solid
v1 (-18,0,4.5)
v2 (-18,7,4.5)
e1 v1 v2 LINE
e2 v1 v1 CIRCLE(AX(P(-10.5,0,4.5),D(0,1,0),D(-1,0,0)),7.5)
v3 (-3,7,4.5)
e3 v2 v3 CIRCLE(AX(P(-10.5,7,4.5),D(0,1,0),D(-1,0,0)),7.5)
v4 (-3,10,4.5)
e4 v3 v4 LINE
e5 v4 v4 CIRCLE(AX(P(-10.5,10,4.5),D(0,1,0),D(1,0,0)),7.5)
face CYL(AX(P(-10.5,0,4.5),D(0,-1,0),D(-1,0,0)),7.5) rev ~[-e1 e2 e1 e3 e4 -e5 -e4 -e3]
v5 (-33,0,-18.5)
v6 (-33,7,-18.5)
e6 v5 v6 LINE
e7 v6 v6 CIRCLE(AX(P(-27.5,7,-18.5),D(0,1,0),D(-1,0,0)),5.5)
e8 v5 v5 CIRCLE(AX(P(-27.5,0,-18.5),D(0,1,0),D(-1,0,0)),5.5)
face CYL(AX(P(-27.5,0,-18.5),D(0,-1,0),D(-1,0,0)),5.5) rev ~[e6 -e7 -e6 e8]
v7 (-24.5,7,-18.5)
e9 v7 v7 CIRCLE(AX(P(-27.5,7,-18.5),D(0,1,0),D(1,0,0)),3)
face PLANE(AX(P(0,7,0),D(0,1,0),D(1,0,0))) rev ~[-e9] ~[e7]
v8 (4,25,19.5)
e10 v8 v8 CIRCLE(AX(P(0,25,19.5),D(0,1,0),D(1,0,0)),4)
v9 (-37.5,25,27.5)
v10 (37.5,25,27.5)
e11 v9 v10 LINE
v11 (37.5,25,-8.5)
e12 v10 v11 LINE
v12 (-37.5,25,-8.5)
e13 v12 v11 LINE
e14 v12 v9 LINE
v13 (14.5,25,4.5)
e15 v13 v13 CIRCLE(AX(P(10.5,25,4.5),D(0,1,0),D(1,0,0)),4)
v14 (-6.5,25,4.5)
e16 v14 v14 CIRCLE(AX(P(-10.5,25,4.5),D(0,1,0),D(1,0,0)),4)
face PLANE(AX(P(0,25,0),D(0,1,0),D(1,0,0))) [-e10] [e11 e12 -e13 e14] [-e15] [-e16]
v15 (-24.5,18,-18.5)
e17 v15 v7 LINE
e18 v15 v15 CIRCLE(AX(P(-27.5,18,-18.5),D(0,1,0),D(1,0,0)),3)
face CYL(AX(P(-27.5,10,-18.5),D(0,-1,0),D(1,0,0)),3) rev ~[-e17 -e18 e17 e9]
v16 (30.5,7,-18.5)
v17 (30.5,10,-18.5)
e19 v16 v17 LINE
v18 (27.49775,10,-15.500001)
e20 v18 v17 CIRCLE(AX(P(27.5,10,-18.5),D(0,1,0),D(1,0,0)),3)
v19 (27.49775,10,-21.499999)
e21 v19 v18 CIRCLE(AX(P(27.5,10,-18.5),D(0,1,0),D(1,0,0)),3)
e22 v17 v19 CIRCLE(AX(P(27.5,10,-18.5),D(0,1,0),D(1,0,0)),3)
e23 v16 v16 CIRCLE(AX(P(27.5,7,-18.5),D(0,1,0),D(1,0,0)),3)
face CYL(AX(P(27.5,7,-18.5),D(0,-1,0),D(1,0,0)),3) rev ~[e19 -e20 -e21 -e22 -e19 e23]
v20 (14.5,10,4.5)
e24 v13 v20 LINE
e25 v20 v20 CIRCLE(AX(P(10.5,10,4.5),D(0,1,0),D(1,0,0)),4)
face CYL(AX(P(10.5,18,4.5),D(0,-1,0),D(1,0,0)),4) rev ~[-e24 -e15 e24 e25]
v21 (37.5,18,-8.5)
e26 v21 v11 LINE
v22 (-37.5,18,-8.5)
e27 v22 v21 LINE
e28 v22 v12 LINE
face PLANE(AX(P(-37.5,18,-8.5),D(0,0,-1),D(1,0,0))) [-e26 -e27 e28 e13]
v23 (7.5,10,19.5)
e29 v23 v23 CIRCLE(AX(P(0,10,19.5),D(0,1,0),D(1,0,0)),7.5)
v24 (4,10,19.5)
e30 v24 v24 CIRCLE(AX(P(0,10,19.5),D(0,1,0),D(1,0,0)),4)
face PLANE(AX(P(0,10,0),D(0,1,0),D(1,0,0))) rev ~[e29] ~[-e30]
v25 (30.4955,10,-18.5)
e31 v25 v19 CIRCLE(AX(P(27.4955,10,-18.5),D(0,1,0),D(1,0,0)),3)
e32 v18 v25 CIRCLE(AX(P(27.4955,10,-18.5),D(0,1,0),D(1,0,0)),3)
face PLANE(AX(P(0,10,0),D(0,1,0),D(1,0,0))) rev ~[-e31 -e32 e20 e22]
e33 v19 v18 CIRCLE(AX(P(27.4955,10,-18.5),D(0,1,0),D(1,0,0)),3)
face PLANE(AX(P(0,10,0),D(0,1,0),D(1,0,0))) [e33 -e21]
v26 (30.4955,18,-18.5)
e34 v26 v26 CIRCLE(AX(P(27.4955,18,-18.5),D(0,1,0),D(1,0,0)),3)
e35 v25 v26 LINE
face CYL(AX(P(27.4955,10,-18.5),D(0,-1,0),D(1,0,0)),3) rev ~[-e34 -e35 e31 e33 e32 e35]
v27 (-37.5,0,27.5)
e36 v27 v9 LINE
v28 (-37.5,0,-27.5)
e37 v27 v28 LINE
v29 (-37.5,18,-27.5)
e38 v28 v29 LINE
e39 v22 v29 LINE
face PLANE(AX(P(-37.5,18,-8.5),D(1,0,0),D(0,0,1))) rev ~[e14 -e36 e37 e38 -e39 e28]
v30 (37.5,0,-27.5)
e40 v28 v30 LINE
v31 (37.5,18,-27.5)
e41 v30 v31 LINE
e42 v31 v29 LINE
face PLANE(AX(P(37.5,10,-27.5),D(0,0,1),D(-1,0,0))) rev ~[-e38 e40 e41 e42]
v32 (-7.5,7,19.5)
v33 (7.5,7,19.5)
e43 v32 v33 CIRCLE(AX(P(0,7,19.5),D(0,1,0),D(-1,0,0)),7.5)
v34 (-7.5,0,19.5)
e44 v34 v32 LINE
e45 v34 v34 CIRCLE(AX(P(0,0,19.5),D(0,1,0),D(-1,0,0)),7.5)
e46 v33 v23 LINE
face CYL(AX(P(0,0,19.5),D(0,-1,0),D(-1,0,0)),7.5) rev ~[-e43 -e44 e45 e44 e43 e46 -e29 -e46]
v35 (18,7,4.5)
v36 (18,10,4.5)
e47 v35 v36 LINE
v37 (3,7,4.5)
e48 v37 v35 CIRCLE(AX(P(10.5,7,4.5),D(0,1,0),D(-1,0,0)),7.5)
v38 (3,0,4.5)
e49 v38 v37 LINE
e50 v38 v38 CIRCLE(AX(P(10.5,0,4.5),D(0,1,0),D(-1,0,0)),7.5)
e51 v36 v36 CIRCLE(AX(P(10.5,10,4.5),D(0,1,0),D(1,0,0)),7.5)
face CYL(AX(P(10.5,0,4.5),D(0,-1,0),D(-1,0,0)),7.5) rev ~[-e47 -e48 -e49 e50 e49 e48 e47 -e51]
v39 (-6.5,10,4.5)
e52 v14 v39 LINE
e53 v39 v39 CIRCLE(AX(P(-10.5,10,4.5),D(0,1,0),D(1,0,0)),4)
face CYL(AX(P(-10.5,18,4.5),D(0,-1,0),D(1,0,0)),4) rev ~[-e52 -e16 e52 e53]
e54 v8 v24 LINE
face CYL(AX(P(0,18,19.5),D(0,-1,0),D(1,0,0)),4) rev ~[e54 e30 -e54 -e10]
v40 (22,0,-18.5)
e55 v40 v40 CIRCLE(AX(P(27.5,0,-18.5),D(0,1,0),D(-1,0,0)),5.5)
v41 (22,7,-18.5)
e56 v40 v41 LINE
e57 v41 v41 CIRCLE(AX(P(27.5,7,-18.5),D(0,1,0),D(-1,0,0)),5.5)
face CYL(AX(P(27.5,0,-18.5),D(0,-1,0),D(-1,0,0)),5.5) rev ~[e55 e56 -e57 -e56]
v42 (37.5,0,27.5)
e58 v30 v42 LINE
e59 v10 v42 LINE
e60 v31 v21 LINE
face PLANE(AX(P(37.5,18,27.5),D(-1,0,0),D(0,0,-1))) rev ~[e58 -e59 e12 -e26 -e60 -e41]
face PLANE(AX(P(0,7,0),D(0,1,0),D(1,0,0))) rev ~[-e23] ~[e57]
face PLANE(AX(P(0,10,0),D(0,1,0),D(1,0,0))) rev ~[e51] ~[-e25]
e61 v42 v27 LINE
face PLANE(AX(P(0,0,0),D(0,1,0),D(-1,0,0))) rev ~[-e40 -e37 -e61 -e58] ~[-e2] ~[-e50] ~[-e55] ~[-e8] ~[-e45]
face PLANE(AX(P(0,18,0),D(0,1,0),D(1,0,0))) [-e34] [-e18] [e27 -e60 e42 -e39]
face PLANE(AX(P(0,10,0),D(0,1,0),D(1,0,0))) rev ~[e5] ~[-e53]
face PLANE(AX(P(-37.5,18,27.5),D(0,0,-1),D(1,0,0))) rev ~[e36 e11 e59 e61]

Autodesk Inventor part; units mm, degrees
ref_plane "YZ Plane" through (0, 0, 0) normal (1, 0, 0) x (0, 1, 0)
ref_plane "XZ Plane" through (0, 0, 0) normal (0, 1, 0) x (-1, 0, 0)
ref_plane "XY Plane" through (0, 0, 0) normal (0, 0, 1) x (1, 0, 0)
sketch "Sketch1" plane through (0, 0, 0) normal (0, 1, 0) x (-1, 0, 0)
  line L0 (-37.5, 27.5) -> (37.5, 27.5)
  line L1 (37.5, 27.5) -> (37.5, -27.5)
  line L2 (37.5, -27.5) -> (-37.5, -27.5)
  line L3 (-37.5, -27.5) -> (-37.5, 27.5)
  line L4 (-37.5, 27.5) -> (37.5, -27.5) construction
  line L5 (37.5, 27.5) -> (-37.5, -27.5) construction
  circle A0 centre (27.5, -18.5) radius 5.5
  circle A1 centre (-27.5, -18.5) radius 5.5
  circle A2 centre (0, 19.5) radius 7.5
  circle A3 centre (10.5, 4.5) radius 7.5
  circle A4 centre (-10.5, 4.5) radius 7.5
  point P0 (0, 0)
  point P1 (0, 27.5)
  dimension "d0" = 75
  dimension "d1" = 55
  dimension "d2" = 11
  dimension "d4" = 11
  dimension "d6" = 55
  dimension "d7" = 10
  dimension "d8" = 10
  dimension "d9" = 15
  dimension "d11" = 15
  dimension "d13" = 15
  dimension "d15" = 23
  dimension "d16" = 8
  dimension "d17" = 21
  dimension "d18" = 10.5
  dimension "d19" = 46
extrude "Extrusion1" add sketch "Sketch1" along normal blind 7
sketch "Sketch2" plane through (0, 7, 0) normal (0, 1, 0) x (1, 0, 0)
  line L0 (37.5, 27.5) -> (-37.5, 27.5) projected
  line L1 (37.5, -27.5) -> (-37.5, -27.5)
  line L2 (-37.5, -27.5) -> (-37.5, 27.5)
  line L3 (-37.5, 27.5) -> (37.5, 27.5)
  line L4 (37.5, 27.5) -> (37.5, -27.5)
  line L5 (37.5, -27.5) -> (-37.5, 27.5) construction
  line L6 (-37.5, -27.5) -> (37.5, 27.5) construction
  circle A0 centre (-27.5, 18.5) radius 3
  circle A1 centre (27.5, 18.5) radius 3
  circle A2 centre (-10.5, -4.5) radius 7.5
  circle A3 centre (10.5, -4.5) radius 7.5
  circle A4 centre (0, -19.5) radius 7.5
  circle A5 centre (0, -19.5) radius 4
  circle A6 centre (-10.5, -4.5) radius 4
  circle A7 centre (10.5, -4.5) radius 4
  line L7 (-37.5, -27.5) -> (37.5, -27.5) projected
  point P0 (0, 0)
  point P1 (0, -27.5)
  point P2 (0, -27.5)
  dimension "d22" = 6
  dimension "d23" = 6
  dimension "d24" = 15
  dimension "d25" = 15
  dimension "d26" = 15
  dimension "d27" = 8
  dimension "d28" = 8
  dimension "d29" = 8
  dimension "d30" = 55
  dimension "d31" = 10
  dimension "d32" = 10
  dimension "d33" = 46
  dimension "d34" = 23
  dimension "d35" = 8
  dimension "d36" = 10.5
  dimension "d37" = 10.5
  dimension "d38" = 21
extrude "Extrusion2" add sketch "Sketch2" along normal blind 3 contours L4 L1 L2 L0
sketch "Sketch3" plane through (0, 10, 0) normal (0, 1, 0) x (1, 0, 0)
  line L0 (37.5, 27.5) -> (-37.5, 27.5) projected
  line L1 (37.5, -27.5) -> (-37.5, -27.5)
  line L2 (-37.5, -27.5) -> (-37.5, 27.5)
  line L3 (-37.5, 27.5) -> (37.5, 27.5)
  line L4 (37.5, 27.5) -> (37.5, -27.5)
  line L5 (37.5, -27.5) -> (-37.5, 27.5) construction
  line L6 (-37.5, -27.5) -> (37.5, 27.5) construction
  circle A0 centre (-27.5, 18.5) radius 3 projected
  circle A1 centre (-27.5, 18.5) radius 3
  circle A2 centre (27.4955, 18.5) radius 3
  circle A3 centre (-10.5, -4.5) radius 4
  circle A4 centre (10.5, -4.5) radius 4
  circle A5 centre (0, -19.5) radius 4
  line L7 (-37.5, -27.5) -> (37.5, -27.5) projected
  point P0 (0, 0)
  point P1 (0, -27.5)
  point P2 (0, -27.5)
  dimension "d41" = 6
  dimension "d42" = 8
  dimension "d43" = 8
  dimension "d44" = 8
  dimension "d45" = 8
  dimension "d46" = 23
  dimension "d47" = 10.5
  dimension "d48" = 10.5
extrude "Extrusion3" add sketch "Sketch3" along normal blind 8
sketch "Sketch4" plane through (0, 18, 0) normal (0, 1, 0) x (1, 0, 0)
  line L0 (-37.5, 8.5) -> (37.5, 8.5)
  line L1 (-37.5, -27.5) -> (37.5, -27.5) projected
  line L2 (-37.5, 27.5) -> (-37.5, -27.5) projected
  line L3 (-37.5, 8.5) -> (-37.5, -27.5)
  line L4 (-37.5, -27.5) -> (37.5, -27.5) projected
  line L5 (-37.5, -27.5) -> (37.5, -27.5)
  line L6 (37.5, -27.5) -> (37.5, 8.5)
  circle A0 centre (-10.5, -4.5) radius 4
  circle A1 centre (10.5, -4.5) radius 4
  circle A2 centre (0, -19.5) radius 4
  point P0 (0, 0)
  point P1 (0, -27.5)
  dimension "d51" = 75
  dimension "d52" = 36
  dimension "d53" = 8
  dimension "d54" = 8
  dimension "d55" = 8
  dimension "d56" = 8
  dimension "d57" = 23
  dimension "d58" = 21
  dimension "d59" = 10.5
extrude "Extrusion4" add sketch "Sketch4" along normal blind 7
properties part number "Feste Backe" material "Steel"
